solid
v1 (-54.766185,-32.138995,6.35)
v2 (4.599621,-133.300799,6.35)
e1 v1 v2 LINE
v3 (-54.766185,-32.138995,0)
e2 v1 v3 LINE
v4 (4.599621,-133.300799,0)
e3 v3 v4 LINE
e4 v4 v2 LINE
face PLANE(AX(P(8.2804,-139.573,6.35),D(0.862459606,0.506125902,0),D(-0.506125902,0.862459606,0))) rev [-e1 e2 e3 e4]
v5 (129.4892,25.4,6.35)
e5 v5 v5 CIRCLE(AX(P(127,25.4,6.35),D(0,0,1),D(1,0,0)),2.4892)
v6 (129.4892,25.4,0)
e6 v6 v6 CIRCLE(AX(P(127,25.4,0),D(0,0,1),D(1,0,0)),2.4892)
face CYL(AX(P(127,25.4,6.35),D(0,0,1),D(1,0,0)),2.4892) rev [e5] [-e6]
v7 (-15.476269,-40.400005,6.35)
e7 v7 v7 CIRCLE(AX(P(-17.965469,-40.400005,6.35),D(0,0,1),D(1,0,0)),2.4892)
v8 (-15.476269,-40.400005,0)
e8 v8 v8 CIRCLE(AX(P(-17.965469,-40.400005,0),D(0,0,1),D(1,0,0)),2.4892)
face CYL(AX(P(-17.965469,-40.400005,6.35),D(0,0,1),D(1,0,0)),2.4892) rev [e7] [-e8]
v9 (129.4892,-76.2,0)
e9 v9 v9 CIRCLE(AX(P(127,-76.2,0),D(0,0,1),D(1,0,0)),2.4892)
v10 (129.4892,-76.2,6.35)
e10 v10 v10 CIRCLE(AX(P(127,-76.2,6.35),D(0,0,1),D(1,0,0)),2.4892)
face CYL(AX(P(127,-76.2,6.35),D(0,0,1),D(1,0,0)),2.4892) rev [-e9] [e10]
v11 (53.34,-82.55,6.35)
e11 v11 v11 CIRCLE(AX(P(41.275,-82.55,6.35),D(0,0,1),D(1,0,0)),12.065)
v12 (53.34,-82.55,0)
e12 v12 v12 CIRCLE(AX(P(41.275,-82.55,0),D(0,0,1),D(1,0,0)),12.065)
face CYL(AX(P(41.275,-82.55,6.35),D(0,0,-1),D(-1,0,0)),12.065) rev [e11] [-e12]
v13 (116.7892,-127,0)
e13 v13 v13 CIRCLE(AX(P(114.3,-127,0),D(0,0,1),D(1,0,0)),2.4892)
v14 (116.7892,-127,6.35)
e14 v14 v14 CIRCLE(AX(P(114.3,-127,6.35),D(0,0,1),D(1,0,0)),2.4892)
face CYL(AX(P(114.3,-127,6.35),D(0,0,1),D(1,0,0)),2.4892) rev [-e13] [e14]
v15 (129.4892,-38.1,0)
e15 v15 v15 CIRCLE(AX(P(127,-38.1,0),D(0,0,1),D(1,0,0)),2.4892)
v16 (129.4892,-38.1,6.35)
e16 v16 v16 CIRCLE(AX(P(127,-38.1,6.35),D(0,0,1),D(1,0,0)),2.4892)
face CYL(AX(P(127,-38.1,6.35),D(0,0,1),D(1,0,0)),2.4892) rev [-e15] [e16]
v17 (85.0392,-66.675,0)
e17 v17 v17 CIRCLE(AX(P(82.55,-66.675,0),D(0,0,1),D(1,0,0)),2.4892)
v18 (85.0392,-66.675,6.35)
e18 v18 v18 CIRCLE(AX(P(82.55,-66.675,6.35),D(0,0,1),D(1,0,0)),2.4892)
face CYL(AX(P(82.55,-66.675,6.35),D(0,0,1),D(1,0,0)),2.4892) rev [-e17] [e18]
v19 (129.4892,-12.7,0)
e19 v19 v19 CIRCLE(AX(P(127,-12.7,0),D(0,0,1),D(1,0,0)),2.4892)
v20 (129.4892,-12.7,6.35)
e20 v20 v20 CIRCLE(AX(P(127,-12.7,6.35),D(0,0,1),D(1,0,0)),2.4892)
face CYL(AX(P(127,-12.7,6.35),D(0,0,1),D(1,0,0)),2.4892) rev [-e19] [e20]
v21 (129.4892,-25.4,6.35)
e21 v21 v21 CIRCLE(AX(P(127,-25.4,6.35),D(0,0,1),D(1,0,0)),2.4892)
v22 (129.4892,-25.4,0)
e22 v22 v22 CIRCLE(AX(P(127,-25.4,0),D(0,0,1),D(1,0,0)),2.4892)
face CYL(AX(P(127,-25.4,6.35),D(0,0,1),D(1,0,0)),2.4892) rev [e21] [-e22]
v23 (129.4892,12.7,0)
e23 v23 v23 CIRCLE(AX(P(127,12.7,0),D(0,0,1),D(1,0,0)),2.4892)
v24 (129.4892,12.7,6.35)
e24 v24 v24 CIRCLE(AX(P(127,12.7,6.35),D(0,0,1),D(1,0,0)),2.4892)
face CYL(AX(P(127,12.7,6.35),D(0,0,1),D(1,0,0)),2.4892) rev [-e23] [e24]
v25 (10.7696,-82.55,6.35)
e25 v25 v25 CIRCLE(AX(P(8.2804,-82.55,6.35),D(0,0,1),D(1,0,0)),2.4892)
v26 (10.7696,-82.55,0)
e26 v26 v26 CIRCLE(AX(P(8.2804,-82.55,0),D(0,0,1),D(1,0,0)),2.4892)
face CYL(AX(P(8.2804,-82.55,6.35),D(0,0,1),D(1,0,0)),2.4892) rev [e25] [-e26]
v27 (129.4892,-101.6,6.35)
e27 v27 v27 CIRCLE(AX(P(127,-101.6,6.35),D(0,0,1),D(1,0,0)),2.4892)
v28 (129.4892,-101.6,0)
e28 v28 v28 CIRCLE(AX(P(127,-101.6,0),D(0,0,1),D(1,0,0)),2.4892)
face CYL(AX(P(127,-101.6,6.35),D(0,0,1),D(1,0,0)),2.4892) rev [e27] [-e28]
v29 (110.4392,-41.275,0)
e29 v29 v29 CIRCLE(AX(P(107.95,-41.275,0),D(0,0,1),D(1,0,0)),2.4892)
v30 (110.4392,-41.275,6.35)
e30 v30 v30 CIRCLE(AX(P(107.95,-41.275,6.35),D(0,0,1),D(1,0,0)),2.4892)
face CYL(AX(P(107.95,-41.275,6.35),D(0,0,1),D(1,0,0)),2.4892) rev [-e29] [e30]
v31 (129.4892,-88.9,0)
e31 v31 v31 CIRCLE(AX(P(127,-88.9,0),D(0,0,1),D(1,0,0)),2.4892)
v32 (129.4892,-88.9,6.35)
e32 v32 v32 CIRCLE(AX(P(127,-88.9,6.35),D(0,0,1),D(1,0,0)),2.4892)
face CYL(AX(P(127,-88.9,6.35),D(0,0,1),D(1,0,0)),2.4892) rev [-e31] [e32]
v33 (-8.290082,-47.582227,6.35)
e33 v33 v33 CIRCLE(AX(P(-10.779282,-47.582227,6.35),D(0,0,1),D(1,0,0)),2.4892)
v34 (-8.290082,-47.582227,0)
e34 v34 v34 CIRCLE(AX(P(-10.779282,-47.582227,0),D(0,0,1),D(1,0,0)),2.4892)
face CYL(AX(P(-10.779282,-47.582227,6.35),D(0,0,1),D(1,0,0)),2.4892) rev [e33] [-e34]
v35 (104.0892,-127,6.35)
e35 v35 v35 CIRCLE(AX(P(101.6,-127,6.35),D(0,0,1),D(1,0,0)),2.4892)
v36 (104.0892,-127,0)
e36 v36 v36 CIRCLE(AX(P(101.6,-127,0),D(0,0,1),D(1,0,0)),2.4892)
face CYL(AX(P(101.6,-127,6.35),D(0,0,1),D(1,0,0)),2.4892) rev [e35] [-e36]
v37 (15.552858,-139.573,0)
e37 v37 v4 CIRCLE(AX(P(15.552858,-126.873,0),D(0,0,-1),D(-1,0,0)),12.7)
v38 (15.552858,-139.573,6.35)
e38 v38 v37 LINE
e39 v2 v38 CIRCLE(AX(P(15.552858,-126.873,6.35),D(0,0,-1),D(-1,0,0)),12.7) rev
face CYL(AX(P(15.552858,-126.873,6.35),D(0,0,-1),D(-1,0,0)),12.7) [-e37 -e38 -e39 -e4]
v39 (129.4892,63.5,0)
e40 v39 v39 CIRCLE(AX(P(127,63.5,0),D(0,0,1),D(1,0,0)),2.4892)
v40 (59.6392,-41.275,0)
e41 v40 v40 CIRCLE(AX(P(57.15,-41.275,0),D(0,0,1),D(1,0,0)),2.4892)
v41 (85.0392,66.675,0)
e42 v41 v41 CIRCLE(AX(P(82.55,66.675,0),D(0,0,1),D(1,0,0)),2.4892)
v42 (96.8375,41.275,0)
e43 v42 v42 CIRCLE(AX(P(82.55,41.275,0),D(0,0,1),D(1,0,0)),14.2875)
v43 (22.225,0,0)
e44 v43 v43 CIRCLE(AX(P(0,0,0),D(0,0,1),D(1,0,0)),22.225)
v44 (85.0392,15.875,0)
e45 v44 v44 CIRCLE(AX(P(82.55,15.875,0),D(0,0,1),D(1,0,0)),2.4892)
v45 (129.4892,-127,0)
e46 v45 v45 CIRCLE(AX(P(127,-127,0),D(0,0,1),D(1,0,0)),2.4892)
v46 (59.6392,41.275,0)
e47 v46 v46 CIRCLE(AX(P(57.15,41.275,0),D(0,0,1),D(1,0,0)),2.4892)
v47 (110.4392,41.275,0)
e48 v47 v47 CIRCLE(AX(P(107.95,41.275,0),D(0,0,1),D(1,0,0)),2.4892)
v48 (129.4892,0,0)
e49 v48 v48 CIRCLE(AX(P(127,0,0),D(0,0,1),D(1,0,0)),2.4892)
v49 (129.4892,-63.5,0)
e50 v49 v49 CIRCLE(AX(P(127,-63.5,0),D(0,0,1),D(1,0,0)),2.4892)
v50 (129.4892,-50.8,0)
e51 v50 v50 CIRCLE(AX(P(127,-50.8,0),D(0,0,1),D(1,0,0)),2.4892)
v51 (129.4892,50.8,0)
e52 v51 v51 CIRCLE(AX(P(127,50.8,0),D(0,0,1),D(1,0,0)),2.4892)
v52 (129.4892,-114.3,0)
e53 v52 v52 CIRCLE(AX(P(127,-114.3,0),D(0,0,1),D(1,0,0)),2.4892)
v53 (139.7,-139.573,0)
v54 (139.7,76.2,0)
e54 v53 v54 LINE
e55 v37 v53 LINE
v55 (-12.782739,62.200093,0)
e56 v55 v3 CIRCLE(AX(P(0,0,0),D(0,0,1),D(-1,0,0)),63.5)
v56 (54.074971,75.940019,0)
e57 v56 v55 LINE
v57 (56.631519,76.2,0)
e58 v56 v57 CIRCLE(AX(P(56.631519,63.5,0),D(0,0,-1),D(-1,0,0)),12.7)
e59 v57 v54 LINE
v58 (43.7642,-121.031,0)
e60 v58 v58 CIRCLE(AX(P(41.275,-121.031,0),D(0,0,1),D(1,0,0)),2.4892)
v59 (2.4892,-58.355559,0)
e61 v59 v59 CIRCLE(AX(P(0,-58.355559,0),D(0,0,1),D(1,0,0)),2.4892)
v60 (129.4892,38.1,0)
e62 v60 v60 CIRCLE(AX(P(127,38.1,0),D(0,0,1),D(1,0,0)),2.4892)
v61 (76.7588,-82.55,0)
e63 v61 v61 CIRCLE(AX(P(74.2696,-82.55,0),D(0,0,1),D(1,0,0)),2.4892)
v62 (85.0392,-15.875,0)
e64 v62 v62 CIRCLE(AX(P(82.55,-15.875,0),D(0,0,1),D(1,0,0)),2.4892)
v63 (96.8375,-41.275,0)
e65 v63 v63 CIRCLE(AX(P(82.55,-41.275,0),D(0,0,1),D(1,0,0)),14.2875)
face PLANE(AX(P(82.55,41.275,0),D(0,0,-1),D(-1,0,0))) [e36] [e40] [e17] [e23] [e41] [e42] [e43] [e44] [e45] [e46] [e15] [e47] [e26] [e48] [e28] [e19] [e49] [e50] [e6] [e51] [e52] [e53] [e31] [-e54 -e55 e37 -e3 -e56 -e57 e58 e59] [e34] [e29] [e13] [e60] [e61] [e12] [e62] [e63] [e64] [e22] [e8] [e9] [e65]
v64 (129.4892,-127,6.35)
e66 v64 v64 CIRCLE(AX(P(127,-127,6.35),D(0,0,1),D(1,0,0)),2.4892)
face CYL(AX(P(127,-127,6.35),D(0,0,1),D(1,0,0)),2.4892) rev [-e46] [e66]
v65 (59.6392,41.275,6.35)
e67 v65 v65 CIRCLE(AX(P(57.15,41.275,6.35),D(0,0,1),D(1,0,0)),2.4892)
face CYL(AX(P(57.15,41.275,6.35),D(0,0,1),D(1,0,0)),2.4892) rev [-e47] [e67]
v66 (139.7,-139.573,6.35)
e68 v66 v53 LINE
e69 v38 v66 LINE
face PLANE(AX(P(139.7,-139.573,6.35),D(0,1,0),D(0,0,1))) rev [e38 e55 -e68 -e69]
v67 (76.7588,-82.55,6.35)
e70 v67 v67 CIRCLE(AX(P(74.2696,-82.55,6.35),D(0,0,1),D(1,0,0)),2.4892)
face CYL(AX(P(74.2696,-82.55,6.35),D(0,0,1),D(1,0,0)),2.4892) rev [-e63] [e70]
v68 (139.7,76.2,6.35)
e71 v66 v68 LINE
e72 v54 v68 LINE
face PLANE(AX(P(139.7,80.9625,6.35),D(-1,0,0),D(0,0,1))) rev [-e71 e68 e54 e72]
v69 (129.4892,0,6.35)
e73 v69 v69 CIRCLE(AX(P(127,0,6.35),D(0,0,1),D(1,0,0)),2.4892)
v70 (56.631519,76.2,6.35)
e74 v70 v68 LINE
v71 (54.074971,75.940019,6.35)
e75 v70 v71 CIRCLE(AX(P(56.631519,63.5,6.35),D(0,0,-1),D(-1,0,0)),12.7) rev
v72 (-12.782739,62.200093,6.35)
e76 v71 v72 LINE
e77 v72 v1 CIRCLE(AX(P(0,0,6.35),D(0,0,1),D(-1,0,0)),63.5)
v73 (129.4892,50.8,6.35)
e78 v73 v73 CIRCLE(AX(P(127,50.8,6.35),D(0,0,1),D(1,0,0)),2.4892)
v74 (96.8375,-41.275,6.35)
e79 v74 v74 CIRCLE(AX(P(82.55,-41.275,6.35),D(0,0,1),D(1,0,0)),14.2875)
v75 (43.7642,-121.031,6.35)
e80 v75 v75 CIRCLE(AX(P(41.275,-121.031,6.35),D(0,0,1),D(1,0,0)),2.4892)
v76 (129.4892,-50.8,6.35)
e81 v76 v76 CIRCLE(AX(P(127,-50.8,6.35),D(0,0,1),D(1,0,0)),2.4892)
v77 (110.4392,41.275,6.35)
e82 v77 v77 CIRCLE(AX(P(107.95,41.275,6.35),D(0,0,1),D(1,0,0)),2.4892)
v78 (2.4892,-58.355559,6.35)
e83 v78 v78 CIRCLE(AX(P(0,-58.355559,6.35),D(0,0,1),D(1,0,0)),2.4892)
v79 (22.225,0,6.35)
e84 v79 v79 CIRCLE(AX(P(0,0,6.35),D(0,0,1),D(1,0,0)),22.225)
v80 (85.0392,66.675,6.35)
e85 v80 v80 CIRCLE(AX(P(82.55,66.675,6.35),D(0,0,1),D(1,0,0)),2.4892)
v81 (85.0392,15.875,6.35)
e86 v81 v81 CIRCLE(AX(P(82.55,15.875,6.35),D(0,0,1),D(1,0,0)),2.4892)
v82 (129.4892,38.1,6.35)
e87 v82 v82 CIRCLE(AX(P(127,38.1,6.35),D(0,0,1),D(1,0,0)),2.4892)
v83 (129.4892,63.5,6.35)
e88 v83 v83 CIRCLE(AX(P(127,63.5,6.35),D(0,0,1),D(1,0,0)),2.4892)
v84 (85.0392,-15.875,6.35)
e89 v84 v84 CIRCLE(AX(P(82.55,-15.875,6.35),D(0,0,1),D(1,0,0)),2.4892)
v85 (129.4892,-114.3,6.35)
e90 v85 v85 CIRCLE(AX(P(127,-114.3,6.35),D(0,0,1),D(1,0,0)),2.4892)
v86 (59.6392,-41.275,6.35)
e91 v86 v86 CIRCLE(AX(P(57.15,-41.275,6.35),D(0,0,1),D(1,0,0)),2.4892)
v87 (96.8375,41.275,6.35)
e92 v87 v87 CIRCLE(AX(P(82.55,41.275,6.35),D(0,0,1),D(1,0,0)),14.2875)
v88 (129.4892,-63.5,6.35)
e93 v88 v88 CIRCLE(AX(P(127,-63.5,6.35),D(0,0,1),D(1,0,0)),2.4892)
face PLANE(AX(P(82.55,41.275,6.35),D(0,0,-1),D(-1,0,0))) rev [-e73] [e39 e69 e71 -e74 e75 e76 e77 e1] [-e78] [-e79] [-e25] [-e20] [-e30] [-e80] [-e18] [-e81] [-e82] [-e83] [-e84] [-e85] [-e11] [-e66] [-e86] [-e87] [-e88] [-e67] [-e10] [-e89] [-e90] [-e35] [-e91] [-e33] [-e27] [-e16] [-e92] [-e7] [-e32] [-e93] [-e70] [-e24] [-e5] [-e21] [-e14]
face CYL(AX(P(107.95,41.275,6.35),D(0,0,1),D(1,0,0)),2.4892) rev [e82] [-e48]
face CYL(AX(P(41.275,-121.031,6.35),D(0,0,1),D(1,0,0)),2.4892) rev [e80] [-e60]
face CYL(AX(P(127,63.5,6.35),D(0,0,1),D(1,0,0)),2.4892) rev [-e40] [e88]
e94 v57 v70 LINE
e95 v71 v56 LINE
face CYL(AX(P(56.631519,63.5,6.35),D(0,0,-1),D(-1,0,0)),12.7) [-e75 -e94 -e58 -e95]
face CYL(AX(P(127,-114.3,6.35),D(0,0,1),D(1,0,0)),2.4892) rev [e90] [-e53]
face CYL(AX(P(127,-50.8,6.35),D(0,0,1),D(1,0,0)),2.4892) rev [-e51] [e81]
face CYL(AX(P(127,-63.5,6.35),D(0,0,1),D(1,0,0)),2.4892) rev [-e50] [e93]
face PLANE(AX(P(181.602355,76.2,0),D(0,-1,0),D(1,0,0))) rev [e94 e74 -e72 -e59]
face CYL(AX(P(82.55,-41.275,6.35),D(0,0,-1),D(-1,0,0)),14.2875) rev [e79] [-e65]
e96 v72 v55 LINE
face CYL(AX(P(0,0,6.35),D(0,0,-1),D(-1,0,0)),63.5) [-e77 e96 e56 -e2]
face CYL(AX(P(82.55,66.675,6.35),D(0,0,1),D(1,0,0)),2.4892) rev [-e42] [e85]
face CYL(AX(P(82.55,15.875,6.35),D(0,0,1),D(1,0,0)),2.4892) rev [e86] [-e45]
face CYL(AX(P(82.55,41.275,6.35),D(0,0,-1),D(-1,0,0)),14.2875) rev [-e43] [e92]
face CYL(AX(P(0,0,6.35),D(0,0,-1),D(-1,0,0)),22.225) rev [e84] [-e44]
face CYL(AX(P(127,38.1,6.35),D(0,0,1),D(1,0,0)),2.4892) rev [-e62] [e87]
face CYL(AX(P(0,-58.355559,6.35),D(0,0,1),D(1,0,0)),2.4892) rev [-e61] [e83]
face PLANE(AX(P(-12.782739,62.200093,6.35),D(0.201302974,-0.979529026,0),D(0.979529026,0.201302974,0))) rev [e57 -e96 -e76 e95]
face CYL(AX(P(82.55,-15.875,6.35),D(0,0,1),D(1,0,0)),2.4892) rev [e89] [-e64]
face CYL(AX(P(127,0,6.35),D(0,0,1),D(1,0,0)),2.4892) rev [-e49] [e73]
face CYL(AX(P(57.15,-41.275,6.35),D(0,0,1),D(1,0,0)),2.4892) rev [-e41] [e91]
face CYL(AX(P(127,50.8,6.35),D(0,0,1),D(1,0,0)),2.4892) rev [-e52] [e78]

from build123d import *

# Parameters (mm, degrees)
SKETCH1_R                          = 22.225
SKETCH1_R_2                        = 14.2875
SKETCH1_R_3                        = 12.065
BOSS_EXTRUDE1_DEPTH                = 6.35
F_9_0_196_DIAMETER_HOLE1_OUTLINE_R = 2.4892
F_9_0_196_DIAMETER_HOLE1_DEPTH     = 6.35
SKETCH5_W                          = 158.475738421
SKETCH5_H                          = 23.945509926
CUT_EXTRUDE1_DEPTH                 = 198.577920905
FILLET1_R                          = 12.7


# Read off the part's stored shape, not the designer's step: #9 (0.196) Diameter Hole1
with BuildPart() as part:
    # Sketch1 → Boss-Extrude1 (new body)
    with BuildSketch(Plane(origin=(0, 0, 0), x_dir=(0, 1, 0), z_dir=(0, 0, 1))):
        with BuildLine():
            Line((80.9625, -82.55), (80.9625, -139.7))
            Line((80.9625, -139.7), (-139.573, -139.7))
            Line((-139.573, -139.7), (-139.573, -8.2804))
            Line((-139.573, -8.2804), (-32.138994776, 54.766184957))
            ThreePointArc((-32.138994776, 54.766184957), (25.818013961, 58.014482288), (62.200093141, 12.782738878))
            Line((62.200093141, 12.782738878), (80.150058213, -74.560788201))
            ThreePointArc((80.150058213, -74.560788201), (80.758867143, -78.534792445), (80.9625, -82.55))
        make_face()
        with Locations(Location((0, 0, 0), (0, 0, 270))):
            Circle(SKETCH1_R, mode=Mode.SUBTRACT)
        with Locations(Location((-41.275, -82.55, 0), (0, 0, 270))):
            Circle(SKETCH1_R_2, mode=Mode.SUBTRACT)
        with Locations(Location((41.275, -82.55, 0), (0, 0, 270))):
            Circle(SKETCH1_R_2, mode=Mode.SUBTRACT)
        with Locations(Location((-82.55, -41.275, 0), (0, 0, 270))):
            Circle(SKETCH1_R_3, mode=Mode.SUBTRACT)
    extrude(amount=BOSS_EXTRUDE1_DEPTH)

    # #9 (0.196) Diameter Hole1 outline → #9 (0.196) Diameter Hole1 (cut)
    with BuildSketch(Plane.XY):
        with Locations((101.6, -127)):
            Circle(F_9_0_196_DIAMETER_HOLE1_OUTLINE_R)
        with Locations((114.3, -127)):
            Circle(F_9_0_196_DIAMETER_HOLE1_OUTLINE_R)
        with Locations((127, 63.5)):
            Circle(F_9_0_196_DIAMETER_HOLE1_OUTLINE_R)
        with Locations((127, 50.8)):
            Circle(F_9_0_196_DIAMETER_HOLE1_OUTLINE_R)
        with Locations((127, 38.1)):
            Circle(F_9_0_196_DIAMETER_HOLE1_OUTLINE_R)
        with Locations((127, 25.4)):
            Circle(F_9_0_196_DIAMETER_HOLE1_OUTLINE_R)
        with Locations((127, 12.7)):
            Circle(F_9_0_196_DIAMETER_HOLE1_OUTLINE_R)
        with Locations((127, 0)):
            Circle(F_9_0_196_DIAMETER_HOLE1_OUTLINE_R)
        with Locations((8.2804, -82.55)):
            Circle(F_9_0_196_DIAMETER_HOLE1_OUTLINE_R)
        with Locations((41.275, -121.031)):
            Circle(F_9_0_196_DIAMETER_HOLE1_OUTLINE_R)
        with Locations((74.2696, -82.55)):
            Circle(F_9_0_196_DIAMETER_HOLE1_OUTLINE_R)
        with Locations((0, -58.355558977)):
            Circle(F_9_0_196_DIAMETER_HOLE1_OUTLINE_R)
        with Locations((-10.779281546, -47.582226654)):
            Circle(F_9_0_196_DIAMETER_HOLE1_OUTLINE_R)
        with Locations((-17.965469244, -40.400005105)):
            Circle(F_9_0_196_DIAMETER_HOLE1_OUTLINE_R)
        with Locations((127, -12.7)):
            Circle(F_9_0_196_DIAMETER_HOLE1_OUTLINE_R)
        with Locations((127, -25.4)):
            Circle(F_9_0_196_DIAMETER_HOLE1_OUTLINE_R)
        with Locations((127, -38.1)):
            Circle(F_9_0_196_DIAMETER_HOLE1_OUTLINE_R)
        with Locations((127, -50.8)):
            Circle(F_9_0_196_DIAMETER_HOLE1_OUTLINE_R)
        with Locations((127, -63.5)):
            Circle(F_9_0_196_DIAMETER_HOLE1_OUTLINE_R)
        with Locations((127, -76.2)):
            Circle(F_9_0_196_DIAMETER_HOLE1_OUTLINE_R)
        with Locations((127, -88.9)):
            Circle(F_9_0_196_DIAMETER_HOLE1_OUTLINE_R)
        with Locations((127, -101.6)):
            Circle(F_9_0_196_DIAMETER_HOLE1_OUTLINE_R)
        with Locations((127, -114.3)):
            Circle(F_9_0_196_DIAMETER_HOLE1_OUTLINE_R)
        with Locations((127, -127)):
            Circle(F_9_0_196_DIAMETER_HOLE1_OUTLINE_R)
        with Locations((107.95, -41.275)):
            Circle(F_9_0_196_DIAMETER_HOLE1_OUTLINE_R)
        with Locations((82.55, -66.675)):
            Circle(F_9_0_196_DIAMETER_HOLE1_OUTLINE_R)
        with Locations((57.15, -41.275)):
            Circle(F_9_0_196_DIAMETER_HOLE1_OUTLINE_R)
        with Locations((82.55, -15.875)):
            Circle(F_9_0_196_DIAMETER_HOLE1_OUTLINE_R)
        with Locations((82.55, 15.875)):
            Circle(F_9_0_196_DIAMETER_HOLE1_OUTLINE_R)
        with Locations((107.95, 41.275)):
            Circle(F_9_0_196_DIAMETER_HOLE1_OUTLINE_R)
        with Locations((82.55, 66.675)):
            Circle(F_9_0_196_DIAMETER_HOLE1_OUTLINE_R)
        with Locations((57.15, 41.275)):
            Circle(F_9_0_196_DIAMETER_HOLE1_OUTLINE_R)
    extrude(amount=F_9_0_196_DIAMETER_HOLE1_DEPTH, mode=Mode.SUBTRACT)

    # Sketch5 → Cut-Extrude1 (cut, through all)
    with BuildSketch(Plane.XY.offset(6.35)):
        with Locations((102.364485766, 88.172754963)):
            Rectangle(SKETCH5_W, SKETCH5_H)
    extrude(amount=-CUT_EXTRUDE1_DEPTH, mode=Mode.SUBTRACT)

    # Fillet1
    fillet1_edges = [part.edges().sort_by_distance(p)[0] for p in [
        (8.2804, -139.573, 3.175),
        (55.340025647, 76.2, 3.175),
    ]]
    fillet(fillet1_edges, radius=FILLET1_R)


solid = part.part
